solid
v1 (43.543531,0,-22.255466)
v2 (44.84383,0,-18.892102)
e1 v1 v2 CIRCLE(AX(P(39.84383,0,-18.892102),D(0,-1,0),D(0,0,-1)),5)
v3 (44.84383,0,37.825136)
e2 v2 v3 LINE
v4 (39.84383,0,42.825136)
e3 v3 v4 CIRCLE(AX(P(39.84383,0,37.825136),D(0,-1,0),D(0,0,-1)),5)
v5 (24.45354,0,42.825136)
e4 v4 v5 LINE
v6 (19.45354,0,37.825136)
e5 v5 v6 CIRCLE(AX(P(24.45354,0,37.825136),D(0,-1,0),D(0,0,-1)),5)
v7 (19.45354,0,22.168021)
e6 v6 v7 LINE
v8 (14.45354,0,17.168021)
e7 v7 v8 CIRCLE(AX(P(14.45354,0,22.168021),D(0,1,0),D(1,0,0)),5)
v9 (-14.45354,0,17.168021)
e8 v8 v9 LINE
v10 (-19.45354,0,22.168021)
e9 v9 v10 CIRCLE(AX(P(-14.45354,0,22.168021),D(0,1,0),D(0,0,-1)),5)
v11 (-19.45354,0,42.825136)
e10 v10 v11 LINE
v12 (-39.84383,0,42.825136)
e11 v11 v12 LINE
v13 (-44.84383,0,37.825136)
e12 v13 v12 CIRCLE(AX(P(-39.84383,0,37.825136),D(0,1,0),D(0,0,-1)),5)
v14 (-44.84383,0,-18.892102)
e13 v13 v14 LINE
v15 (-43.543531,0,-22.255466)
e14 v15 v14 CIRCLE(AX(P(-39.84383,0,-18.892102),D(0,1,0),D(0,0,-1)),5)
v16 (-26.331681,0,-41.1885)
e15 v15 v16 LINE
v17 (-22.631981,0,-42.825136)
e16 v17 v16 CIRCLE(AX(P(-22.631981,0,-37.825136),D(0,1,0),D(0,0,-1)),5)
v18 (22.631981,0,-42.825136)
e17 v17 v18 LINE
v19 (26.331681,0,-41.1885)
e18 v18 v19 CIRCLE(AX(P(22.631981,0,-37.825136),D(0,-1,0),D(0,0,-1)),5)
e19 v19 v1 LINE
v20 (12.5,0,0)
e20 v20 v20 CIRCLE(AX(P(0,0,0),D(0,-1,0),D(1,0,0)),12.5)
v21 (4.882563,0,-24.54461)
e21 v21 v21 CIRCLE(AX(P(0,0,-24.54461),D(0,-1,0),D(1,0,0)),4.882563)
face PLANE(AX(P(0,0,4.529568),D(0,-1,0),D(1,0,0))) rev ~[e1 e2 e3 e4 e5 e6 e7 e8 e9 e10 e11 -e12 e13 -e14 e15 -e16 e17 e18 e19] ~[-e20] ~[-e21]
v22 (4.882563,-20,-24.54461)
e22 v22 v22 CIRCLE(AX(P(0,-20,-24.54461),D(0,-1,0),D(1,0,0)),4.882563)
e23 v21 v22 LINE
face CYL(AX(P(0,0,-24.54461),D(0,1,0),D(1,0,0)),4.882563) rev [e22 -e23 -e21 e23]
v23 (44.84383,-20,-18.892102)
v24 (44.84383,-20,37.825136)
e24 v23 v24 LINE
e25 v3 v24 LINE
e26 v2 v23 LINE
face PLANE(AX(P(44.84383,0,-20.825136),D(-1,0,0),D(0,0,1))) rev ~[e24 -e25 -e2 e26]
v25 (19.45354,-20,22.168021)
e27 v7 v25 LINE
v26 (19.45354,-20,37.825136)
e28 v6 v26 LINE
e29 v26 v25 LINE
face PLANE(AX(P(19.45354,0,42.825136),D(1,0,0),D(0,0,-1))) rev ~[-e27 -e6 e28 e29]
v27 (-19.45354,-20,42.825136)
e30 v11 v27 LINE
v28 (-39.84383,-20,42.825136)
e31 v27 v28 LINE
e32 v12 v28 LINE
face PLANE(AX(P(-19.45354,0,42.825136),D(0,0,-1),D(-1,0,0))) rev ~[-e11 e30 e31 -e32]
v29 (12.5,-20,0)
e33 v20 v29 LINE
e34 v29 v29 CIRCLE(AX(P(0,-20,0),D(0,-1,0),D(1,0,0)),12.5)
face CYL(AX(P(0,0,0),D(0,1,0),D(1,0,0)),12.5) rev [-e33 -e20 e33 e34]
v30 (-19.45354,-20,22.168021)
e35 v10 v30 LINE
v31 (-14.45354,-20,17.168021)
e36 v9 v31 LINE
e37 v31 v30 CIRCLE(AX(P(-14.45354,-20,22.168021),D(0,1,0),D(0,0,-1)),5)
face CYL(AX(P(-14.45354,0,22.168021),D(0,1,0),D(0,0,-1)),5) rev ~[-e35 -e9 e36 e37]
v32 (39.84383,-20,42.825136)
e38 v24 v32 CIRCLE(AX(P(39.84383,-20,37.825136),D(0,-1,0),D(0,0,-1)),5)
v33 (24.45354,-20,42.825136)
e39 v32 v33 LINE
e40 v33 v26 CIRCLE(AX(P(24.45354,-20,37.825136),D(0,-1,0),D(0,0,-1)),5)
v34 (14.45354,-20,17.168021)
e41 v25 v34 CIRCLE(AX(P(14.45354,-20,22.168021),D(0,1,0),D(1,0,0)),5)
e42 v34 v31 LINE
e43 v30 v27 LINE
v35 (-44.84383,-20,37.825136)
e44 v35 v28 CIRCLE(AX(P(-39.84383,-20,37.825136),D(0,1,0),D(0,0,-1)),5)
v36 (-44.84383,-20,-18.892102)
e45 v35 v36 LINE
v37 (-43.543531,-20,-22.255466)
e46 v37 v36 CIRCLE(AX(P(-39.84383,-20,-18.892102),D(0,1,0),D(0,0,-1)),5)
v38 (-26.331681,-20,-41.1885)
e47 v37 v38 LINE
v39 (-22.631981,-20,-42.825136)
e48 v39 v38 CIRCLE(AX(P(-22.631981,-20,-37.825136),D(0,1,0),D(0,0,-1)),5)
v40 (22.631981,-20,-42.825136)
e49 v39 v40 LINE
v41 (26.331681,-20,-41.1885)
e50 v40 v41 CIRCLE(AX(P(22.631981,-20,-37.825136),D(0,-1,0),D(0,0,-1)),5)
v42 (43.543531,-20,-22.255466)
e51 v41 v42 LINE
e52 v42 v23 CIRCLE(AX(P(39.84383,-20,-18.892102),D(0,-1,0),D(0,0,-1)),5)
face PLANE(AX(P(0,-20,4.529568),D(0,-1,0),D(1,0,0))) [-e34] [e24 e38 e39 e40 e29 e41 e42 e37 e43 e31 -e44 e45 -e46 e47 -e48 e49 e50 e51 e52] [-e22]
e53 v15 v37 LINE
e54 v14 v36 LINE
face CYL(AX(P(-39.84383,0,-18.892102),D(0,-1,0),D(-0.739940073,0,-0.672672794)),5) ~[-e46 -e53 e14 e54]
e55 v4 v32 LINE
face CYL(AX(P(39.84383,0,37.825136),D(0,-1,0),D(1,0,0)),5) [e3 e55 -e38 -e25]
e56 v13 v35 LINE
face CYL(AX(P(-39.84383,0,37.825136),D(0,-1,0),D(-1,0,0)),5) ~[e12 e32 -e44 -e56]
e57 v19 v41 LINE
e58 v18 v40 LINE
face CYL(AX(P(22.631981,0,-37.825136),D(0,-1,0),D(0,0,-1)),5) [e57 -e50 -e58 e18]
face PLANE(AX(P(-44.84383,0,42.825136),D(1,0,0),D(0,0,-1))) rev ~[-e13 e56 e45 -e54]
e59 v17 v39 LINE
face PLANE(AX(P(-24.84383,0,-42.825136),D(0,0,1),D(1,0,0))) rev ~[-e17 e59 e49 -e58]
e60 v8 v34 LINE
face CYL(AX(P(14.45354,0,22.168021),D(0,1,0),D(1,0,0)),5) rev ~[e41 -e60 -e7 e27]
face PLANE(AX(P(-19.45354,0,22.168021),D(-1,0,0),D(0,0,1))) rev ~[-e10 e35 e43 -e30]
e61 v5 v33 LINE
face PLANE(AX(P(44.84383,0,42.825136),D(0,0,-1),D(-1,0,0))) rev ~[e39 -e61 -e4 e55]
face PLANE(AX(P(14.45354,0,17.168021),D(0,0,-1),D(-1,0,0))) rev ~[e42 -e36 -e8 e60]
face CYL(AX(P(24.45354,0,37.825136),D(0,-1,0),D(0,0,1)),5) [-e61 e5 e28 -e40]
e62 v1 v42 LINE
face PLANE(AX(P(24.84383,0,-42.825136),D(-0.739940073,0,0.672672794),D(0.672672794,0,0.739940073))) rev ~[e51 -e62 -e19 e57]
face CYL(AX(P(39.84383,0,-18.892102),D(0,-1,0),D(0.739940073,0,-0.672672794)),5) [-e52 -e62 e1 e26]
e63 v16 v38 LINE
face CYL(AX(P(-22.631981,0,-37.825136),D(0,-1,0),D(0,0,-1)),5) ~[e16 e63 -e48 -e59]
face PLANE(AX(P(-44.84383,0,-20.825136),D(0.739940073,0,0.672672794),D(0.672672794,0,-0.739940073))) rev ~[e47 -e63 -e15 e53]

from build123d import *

# Parameters (mm, degrees)
F0_R     = 4.8825627193
F0_R_2   = 12.5
F1_DEPTH = 20
F2_R     = 5


with BuildPart() as f1:
    # F0 (on Front) → F1 (new body)
    with BuildSketch(Plane.XZ):
        with BuildLine():
            Line((-24.8438301682, -42.8251363337), (24.8438301682, -42.8251363337))
            Line((24.8438301682, -42.8251363337), (44.8438301682, -20.8251363337))
            Line((44.8438301682, -20.8251363337), (44.8438301682, 42.8251363337))
            Line((44.8438301682, 42.8251363337), (19.4535404444, 42.8251363337))
            Line((19.4535404444, 42.8251363337), (19.4535404444, 22.1680208296))
            ThreePointArc((19.4535404444, 22.1680208296), (17.9890743503, 18.6324869236), (14.4535404444, 17.1680208296))
            Line((14.4535404444, 17.1680208296), (-14.4535404444, 17.1680208296))
            ThreePointArc((-14.4535404444, 17.1680208296), (-17.9890743503, 18.6324869236), (-19.4535404444, 22.1680208296))
            Line((-19.4535404444, 22.1680208296), (-19.4535404444, 42.8251363337))
            Line((-19.4535404444, 42.8251363337), (-44.8438301682, 42.8251363337))
            Line((-44.8438301682, 42.8251363337), (-44.8438301682, -20.8251363337))
            Line((-44.8438301682, -20.8251363337), (-24.8438301682, -42.8251363337))
        make_face()
        with Locations((0, -24.5446097106)):
            Circle(F0_R, mode=Mode.SUBTRACT)
        Circle(F0_R_2, mode=Mode.SUBTRACT)
    extrude(amount=F1_DEPTH)

    # F2
    f2_edges = [f1.edges().sort_by_distance(p)[0] for p in [
        (44.84383, -10, 42.825136),
        (-24.84383, -10, -42.825136),
        (24.84383, -10, -42.825136),
        (44.84383, -10, -20.825136),
        (19.45354, -10, 42.825136),
        (-44.84383, -10, 42.825136),
        (-44.84383, -10, -20.825136),
    ]]
    fillet(f2_edges, radius=F2_R)


solid = f1.part
